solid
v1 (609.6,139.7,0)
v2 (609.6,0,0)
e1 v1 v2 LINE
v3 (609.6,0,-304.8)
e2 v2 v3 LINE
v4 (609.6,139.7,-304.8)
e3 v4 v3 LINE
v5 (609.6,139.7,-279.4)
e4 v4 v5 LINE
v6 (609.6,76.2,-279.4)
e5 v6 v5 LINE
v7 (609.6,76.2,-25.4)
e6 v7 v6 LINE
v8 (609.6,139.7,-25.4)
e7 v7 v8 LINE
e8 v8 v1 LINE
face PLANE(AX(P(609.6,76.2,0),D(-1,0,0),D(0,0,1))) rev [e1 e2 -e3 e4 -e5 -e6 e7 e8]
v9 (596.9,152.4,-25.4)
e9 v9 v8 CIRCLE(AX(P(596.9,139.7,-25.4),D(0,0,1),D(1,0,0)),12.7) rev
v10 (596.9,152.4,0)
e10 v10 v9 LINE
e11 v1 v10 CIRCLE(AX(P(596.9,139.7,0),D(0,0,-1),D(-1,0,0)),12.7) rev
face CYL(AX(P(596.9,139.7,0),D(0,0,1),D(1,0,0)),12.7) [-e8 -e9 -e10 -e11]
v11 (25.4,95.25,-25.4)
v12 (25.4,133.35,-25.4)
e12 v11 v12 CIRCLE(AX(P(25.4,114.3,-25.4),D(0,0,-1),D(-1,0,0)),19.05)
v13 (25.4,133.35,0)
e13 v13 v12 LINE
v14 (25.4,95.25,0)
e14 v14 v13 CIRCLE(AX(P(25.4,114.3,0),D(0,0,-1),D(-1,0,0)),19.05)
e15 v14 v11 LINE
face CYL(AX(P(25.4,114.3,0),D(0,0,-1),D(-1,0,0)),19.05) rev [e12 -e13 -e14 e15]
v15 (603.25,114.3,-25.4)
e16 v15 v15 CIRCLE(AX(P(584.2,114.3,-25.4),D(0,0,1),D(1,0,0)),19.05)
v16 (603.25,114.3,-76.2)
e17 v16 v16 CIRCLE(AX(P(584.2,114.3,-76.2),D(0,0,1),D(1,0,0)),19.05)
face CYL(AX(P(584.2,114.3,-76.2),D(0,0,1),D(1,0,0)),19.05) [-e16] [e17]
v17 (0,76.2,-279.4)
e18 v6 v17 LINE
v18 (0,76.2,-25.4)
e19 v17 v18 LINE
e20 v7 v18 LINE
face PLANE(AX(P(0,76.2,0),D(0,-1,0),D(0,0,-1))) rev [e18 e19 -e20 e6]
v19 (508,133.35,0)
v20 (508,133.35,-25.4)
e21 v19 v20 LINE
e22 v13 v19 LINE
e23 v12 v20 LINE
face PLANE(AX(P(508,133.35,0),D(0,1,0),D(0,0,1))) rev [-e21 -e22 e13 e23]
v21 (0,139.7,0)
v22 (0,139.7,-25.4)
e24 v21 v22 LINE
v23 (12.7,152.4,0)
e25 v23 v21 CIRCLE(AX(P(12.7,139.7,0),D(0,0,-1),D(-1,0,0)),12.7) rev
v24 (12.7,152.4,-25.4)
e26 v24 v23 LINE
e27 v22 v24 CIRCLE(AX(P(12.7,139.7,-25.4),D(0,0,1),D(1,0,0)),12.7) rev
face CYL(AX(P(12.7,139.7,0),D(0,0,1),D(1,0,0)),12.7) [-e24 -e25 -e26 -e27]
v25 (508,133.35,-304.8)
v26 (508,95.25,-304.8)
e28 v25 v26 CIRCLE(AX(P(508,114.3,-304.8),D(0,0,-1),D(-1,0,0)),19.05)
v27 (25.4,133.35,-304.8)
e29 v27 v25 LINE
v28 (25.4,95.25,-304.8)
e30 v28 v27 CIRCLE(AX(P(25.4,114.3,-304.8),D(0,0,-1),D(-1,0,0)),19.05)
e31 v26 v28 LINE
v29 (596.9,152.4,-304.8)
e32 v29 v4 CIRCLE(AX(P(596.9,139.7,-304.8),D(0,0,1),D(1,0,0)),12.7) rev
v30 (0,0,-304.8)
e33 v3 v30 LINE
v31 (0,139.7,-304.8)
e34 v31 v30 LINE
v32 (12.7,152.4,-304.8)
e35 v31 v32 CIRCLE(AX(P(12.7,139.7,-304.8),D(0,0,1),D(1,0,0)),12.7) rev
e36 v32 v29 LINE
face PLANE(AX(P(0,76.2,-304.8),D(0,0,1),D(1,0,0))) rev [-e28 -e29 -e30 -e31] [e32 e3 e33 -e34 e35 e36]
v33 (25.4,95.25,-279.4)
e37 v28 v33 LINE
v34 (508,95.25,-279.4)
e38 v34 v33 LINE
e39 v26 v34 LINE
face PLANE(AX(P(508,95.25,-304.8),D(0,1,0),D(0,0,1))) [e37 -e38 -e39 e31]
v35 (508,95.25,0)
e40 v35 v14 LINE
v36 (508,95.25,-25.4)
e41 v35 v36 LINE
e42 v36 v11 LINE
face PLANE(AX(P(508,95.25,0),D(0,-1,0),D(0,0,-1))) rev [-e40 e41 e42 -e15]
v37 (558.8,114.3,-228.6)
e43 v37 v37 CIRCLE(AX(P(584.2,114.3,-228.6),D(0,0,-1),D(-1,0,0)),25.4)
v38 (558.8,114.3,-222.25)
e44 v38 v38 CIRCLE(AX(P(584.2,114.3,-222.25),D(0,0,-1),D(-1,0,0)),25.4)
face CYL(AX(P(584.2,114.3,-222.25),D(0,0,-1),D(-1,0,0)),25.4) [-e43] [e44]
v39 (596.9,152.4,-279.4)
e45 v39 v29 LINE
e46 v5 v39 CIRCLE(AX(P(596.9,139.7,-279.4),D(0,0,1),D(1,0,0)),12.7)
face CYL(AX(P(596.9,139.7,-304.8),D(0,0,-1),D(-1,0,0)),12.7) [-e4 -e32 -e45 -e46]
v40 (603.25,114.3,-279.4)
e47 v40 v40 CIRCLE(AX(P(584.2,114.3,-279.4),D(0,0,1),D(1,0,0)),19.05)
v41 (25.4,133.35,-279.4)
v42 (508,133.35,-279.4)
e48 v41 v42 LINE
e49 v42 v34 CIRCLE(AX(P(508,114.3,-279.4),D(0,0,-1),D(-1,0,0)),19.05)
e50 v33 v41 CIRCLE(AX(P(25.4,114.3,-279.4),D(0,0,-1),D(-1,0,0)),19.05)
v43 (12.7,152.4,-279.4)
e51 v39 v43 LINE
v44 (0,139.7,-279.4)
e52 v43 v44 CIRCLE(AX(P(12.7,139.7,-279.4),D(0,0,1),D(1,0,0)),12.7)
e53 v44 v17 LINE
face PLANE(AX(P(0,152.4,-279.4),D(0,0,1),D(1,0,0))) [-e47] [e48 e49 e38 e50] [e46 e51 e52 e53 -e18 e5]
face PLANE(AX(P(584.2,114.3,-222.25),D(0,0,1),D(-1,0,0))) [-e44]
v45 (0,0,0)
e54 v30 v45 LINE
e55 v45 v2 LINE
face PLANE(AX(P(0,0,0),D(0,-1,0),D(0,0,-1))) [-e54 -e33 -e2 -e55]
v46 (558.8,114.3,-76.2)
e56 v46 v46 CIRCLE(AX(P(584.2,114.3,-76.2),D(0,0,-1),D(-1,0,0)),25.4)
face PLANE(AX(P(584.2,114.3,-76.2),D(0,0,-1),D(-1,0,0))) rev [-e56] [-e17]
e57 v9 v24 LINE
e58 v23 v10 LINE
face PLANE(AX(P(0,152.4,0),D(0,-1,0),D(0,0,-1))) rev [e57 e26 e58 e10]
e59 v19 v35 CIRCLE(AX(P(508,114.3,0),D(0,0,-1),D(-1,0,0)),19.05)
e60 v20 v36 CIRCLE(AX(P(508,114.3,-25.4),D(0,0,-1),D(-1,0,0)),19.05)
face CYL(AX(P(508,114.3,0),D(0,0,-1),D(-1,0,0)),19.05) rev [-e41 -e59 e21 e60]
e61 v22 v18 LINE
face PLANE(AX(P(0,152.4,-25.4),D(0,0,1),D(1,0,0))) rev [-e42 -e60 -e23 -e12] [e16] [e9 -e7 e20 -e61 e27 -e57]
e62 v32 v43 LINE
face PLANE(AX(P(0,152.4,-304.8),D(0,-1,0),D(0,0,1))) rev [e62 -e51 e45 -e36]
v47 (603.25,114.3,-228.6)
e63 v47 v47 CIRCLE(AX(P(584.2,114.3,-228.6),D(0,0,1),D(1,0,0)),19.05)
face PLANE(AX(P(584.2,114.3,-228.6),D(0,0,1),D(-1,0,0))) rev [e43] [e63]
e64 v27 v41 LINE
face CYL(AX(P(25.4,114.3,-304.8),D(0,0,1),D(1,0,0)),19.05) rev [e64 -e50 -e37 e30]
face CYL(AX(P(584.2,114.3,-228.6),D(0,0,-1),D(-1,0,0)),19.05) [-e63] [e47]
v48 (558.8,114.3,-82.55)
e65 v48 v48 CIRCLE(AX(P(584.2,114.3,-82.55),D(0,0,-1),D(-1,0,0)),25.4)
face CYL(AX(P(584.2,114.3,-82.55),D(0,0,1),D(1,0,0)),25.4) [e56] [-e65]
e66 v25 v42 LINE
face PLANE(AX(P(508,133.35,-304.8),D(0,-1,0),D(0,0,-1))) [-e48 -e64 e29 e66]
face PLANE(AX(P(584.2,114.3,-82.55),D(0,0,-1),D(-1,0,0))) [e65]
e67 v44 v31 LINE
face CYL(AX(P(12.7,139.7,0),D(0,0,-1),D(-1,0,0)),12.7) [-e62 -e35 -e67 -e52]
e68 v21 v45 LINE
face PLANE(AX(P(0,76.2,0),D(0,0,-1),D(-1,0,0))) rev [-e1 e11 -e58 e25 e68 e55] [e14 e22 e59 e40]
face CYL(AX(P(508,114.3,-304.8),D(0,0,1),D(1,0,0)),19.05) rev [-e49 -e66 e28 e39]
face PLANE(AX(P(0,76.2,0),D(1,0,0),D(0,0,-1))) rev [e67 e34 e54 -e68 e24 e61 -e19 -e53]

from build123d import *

# Parameters (mm, degrees)
SKETCH1_W             = 609.6
SKETCH1_H             = 304.8
BOSS_EXTRUDE1_DEPTH   = 76.2
SKETCH2_W             = 533.4
SKETCH2_H             = 25.4
BOSS_EXTRUDE2_DEPTH   = 76.2
CUT_EXTRUDE1_DEPTH    = 688.678907631
SKETCH4_W             = 25.4
SKETCH4_H             = 76.2
BOSS_EXTRUDE3_DEPTH   = 76.2
SKETCH5_R             = 19.05
BOSS_EXTRUDE4_DEPTH   = 50.8
SKETCH6_R             = 25.4
BOSS_EXTRUDE7_DEPTH   = 6.35
FILLET1_R             = 12.7
MIRROR1_START         = -304.8
MIRROR1_DEPTH         = 25.4
MIRROR1_START_2       = -279.4
MIRROR1_2_OUTLINE_R   = 19.05
MIRROR1_2_DEPTH       = 57.15
MIRROR1_START_3       = -228.6
MIRROR1_3_OUTLINE_R   = 25.4
MIRROR1_3_OUTLINE_R_2 = 19.05
MIRROR1_3_DEPTH       = 6.35


# Read off the part's stored shape, not the designer's step: Mirror1
with BuildPart() as part:
    # Sketch1 → Boss-Extrude1 (new body)
    with BuildSketch(Plane(origin=(0, 0, 0), x_dir=(1, 0, 0), z_dir=(0, 1, 0))):
        with Locations((304.8, 152.4)):
            Rectangle(SKETCH1_W, SKETCH1_H)
    extrude(amount=BOSS_EXTRUDE1_DEPTH)

    # Sketch2 → Boss-Extrude2 (add)
    with BuildSketch(Plane(origin=(0, 76.2, 0), x_dir=(1, 0, 0), z_dir=(0, 1, 0))):
        with Locations((266.7, 12.7)):
            Rectangle(SKETCH2_W, SKETCH2_H)
    extrude(amount=BOSS_EXTRUDE2_DEPTH)

    # Sketch3 → Cut-Extrude1 (cut, through all)
    with BuildSketch(Plane(origin=(0, 0, -25.4), x_dir=(-1, 0, 0), z_dir=(0, 0, -1))):
        with BuildLine():
            Line((-508, 133.35), (-25.4, 133.35))
            ThreePointArc((-25.4, 133.35), (-6.35, 114.3), (-25.4, 95.25))
            Line((-25.4, 95.25), (-508, 95.25))
            ThreePointArc((-508, 95.25), (-527.05, 114.3), (-508, 133.35))
        make_face()
    extrude(amount=-CUT_EXTRUDE1_DEPTH, mode=Mode.SUBTRACT)

    # Sketch4 → Boss-Extrude3 (add, through all)
    with BuildSketch(Plane(origin=(533.4, 0, 0), x_dir=(0, 0, -1), z_dir=(1, 0, 0))):
        with Locations((12.7, 114.3)):
            Rectangle(SKETCH4_W, SKETCH4_H)
    extrude(amount=BOSS_EXTRUDE3_DEPTH)

    # Sketch5 → Boss-Extrude4 (add)
    with BuildSketch(Plane.XY.offset(-25.4)):
        with Locations((584.2, 114.3)):
            Circle(SKETCH5_R)
    extrude(amount=-BOSS_EXTRUDE4_DEPTH)

    # Sketch6 → Boss-Extrude7 (add)
    with BuildSketch(Plane(origin=(0, 0, -76.2), x_dir=(-1, 0, 0), z_dir=(0, 0, -1))):
        with Locations((-584.2, 114.3)):
            Circle(SKETCH6_R)
    extrude(amount=BOSS_EXTRUDE7_DEPTH)

    # Fillet1
    fillet1_edges = [part.edges().sort_by_distance(p)[0] for p in [
        (0, 152.4, -12.7),
        (609.6, 152.4, -12.7),
    ]]
    fillet(fillet1_edges, radius=FILLET1_R)

    # Mirror1 outline → Mirror1 (add)
    with BuildSketch(Plane.XY.offset(MIRROR1_START)):
        with BuildLine():
            Line((596.9, 152.4), (12.7, 152.4))
            ThreePointArc((12.7, 152.4), (3.719743879, 148.680256121), (0, 139.7))
            Line((0, 139.7), (0, 76.2))
            Line((0, 76.2), (609.6, 76.2))
            Line((609.6, 76.2), (609.6, 139.7))
            ThreePointArc((609.6, 139.7), (605.880256121, 148.680256121), (596.9, 152.4))
        make_face()
        with BuildLine():
            ThreePointArc((508, 133.35), (527.05, 114.3), (508, 95.25))
            Line((508, 95.25), (25.4, 95.25))
            ThreePointArc((25.4, 95.25), (6.35, 114.3), (25.4, 133.35))
            Line((25.4, 133.35), (508, 133.35))
        make_face(mode=Mode.SUBTRACT)
    extrude(amount=MIRROR1_DEPTH)

    # Mirror1 2 outline → Mirror1 2 (add)
    with BuildSketch(Plane.XY.offset(MIRROR1_START_2)):
        with Locations((584.2, 114.3)):
            Circle(MIRROR1_2_OUTLINE_R)
    extrude(amount=MIRROR1_2_DEPTH)

    # Mirror1 3 outline → Mirror1 3 (add)
    with BuildSketch(Plane.XY.offset(MIRROR1_START_3)):
        with Locations((584.2, 114.3)):
            Circle(MIRROR1_3_OUTLINE_R)
        with Locations((584.2, 114.3)):
            Circle(MIRROR1_3_OUTLINE_R_2, mode=Mode.SUBTRACT)
    extrude(amount=MIRROR1_3_DEPTH)


solid = part.part
